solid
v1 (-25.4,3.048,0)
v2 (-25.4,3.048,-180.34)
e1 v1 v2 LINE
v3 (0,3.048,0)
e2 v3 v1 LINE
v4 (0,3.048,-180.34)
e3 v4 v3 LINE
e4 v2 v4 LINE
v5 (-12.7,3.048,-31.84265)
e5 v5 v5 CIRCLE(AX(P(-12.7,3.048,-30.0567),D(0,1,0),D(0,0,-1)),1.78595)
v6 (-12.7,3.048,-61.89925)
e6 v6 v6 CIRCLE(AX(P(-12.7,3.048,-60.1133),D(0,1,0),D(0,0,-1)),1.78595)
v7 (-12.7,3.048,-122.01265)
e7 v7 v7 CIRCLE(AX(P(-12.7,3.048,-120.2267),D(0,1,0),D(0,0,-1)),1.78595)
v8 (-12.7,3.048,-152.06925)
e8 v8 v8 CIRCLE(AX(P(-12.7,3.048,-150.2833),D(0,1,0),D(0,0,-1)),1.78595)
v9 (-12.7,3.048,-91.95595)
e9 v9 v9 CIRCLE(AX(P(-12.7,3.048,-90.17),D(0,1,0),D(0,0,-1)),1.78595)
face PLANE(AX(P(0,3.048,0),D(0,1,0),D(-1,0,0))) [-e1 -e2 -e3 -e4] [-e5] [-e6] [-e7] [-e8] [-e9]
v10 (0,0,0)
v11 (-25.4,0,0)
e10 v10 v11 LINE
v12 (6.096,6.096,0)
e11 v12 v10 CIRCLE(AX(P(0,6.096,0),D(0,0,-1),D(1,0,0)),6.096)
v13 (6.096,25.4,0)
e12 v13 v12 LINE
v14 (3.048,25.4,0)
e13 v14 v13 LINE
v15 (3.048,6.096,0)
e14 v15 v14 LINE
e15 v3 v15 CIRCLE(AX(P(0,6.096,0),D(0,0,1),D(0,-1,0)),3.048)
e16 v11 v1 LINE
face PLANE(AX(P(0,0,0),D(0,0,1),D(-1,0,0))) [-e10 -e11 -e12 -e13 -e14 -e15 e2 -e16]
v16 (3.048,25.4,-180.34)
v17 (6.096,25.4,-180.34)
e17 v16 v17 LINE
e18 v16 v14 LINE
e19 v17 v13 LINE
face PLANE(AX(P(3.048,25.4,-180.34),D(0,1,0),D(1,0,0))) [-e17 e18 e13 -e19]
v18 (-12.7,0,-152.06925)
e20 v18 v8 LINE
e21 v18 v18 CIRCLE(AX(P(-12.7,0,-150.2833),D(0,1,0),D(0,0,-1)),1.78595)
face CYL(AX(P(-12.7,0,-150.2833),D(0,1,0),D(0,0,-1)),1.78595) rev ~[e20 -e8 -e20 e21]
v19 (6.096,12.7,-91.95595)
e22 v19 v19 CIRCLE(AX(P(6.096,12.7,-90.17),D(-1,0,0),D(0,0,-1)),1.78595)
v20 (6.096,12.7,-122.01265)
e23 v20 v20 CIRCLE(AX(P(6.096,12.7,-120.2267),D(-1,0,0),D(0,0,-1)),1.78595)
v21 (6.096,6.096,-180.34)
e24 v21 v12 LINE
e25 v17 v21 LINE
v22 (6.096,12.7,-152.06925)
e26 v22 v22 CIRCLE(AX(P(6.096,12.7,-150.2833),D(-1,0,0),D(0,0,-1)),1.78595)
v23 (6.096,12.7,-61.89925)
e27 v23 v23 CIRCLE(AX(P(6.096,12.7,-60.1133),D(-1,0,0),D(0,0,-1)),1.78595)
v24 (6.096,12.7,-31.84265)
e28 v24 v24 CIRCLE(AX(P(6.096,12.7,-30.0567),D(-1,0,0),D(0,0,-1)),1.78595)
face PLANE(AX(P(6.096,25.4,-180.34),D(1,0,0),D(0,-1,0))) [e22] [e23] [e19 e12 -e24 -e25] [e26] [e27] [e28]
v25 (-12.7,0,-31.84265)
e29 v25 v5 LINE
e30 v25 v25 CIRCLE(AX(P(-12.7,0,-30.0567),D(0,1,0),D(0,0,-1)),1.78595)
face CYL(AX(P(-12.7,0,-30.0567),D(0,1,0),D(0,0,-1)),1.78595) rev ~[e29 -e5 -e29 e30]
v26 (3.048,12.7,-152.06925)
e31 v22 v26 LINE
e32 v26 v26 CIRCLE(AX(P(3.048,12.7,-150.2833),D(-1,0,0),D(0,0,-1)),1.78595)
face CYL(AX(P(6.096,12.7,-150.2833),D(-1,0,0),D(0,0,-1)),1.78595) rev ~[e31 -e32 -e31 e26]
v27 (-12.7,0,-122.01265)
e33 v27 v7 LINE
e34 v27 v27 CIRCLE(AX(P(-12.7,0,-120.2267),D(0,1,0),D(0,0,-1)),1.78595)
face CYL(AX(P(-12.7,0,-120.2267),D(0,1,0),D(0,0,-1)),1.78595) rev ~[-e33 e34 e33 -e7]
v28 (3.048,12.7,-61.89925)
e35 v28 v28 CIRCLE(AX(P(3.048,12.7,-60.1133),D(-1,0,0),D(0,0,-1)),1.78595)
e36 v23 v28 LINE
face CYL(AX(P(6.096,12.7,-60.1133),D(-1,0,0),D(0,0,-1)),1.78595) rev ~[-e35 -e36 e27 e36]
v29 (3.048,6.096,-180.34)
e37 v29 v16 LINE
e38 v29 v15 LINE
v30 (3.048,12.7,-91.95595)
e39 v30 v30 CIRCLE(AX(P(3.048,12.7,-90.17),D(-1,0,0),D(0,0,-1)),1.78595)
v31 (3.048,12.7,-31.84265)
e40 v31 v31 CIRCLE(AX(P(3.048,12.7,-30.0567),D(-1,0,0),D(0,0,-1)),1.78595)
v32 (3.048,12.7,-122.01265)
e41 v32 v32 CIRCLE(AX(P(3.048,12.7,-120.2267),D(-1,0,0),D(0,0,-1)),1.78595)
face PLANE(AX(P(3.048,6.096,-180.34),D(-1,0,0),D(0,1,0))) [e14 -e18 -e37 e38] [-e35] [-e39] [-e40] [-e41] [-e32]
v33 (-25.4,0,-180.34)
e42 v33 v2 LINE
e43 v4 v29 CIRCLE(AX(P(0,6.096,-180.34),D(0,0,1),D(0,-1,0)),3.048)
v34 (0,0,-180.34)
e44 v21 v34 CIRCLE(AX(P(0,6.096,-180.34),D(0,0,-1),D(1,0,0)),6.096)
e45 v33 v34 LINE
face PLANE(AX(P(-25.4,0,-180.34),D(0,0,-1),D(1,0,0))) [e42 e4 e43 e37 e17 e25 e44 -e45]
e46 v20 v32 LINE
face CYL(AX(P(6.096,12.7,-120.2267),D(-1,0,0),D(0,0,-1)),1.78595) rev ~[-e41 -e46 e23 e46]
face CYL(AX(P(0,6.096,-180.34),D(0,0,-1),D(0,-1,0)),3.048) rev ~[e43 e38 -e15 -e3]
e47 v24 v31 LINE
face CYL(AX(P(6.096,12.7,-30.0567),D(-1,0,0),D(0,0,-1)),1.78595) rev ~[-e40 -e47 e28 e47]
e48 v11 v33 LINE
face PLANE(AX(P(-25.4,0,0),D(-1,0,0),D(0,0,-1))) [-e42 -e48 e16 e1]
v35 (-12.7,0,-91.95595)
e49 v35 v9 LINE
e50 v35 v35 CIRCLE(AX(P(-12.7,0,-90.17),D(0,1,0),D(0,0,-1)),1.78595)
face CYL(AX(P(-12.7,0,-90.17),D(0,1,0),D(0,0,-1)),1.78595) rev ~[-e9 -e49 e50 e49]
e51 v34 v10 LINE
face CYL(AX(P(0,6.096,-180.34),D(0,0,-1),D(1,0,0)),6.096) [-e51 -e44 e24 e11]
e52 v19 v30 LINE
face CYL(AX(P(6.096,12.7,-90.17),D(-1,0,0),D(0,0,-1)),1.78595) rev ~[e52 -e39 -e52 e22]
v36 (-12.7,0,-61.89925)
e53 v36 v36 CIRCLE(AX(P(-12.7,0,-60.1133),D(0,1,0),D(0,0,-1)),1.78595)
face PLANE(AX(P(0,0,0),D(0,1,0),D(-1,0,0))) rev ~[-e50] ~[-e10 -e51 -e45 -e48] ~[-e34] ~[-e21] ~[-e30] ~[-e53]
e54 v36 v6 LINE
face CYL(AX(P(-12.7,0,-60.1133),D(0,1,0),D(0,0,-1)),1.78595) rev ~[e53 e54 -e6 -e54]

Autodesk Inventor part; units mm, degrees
ref_plane "YZ Plane" through (0, 0, 0) normal (1, 0, 0) x (0, 1, 0)
ref_plane "XZ Plane" through (0, 0, 0) normal (0, 1, 0) x (-1, 0, 0)
ref_plane "XY Plane" through (0, 0, 0) normal (0, 0, 1) x (1, 0, 0)
sketch "Sketch1" plane through (0, 0, 0) normal (0, 1, 0) x (-1, 0, 0)
  line L0 (0, 0) -> (25.4, 0)
  line L1 (25.4, 0) -> (25.4, -180.34)
  line L2 (25.4, -180.34) -> (0, -180.34)
  line L3 (0, -180.34) -> (0, 0)
  dimension "d0" = 25.4
  dimension "d1" = 180.34
extrude "Plate1" add sketch "Sketch1" along normal blind 3.048
sketch "Sketch2" plane through (3.048, 6.096, -180.34) normal (1, 0, 0) x (0, 1, 0)
  line L0 (0, 180.34) -> (0, 0)
  line L1 (0, 0) -> (19.304, 0)
  line L2 (19.304, 0) -> (19.304, 180.34)
  line L3 (19.304, 180.34) -> (0, 180.34)
edge flange "Flange1" height 25.4 angle 90 thickness 3.048 bend radius 3.048 thickness toward (1, 0, 0) relief tear relief width 3.048 relief depth 1.524 edges at (0, 3.048, -90.17) wall of the first edge with corners at (3.048, 6.096, 0) (3.048, 6.096, -180.34) (3.048, 25.4, -180.34) (3.048, 25.4, 0)
bend "Bend1"
corner "Corner1"
sketch "Sketch3" plane through (0, 0, 0) normal (0, -1, 0) x (1, 0, 0)
  line L0 (-25.4, 0) -> (-25.4, -180.34) projected
  line L1 (-25.4, -180.34) -> (0, -180.34) construction
  line L2 (-12.7, -180.34) -> (-12.7, -150.2833) construction
  line L3 (-12.7, -150.2833) -> (-12.7, -120.2267) construction
  line L4 (-12.7, -120.2267) -> (-12.7, -90.17) construction
  line L5 (-12.7, -90.17) -> (-12.7, -60.1133) construction
  line L6 (-12.7, -60.1133) -> (-12.7, -30.0567) construction
  line L7 (-12.7, -30.0567) -> (-12.7, 0) construction
  line L8 (0, 0) -> (-25.4, 0) construction
  dimension "d13" = 12.7
hole "Hole1" at (-12.7, 0, -120.2267) at (-12.7, 0, -150.2833) at (-12.7, 0, -90.17) at (-12.7, 0, -60.1133) at (-12.7, 0, -30.0567) direction (0, 1, 0) diameter 3.5719 depth 3.048 tip angle 118
sketch "Sketch4" plane through (6.096, 25.4, 0) normal (1, 0, 0) x (0, 0, -1)
  line L0 (0, -12.7) -> (30.0567, -12.7) construction
  line L1 (30.0567, -12.7) -> (60.1133, -12.7) construction
  line L2 (60.1133, -12.7) -> (90.17, -12.7) construction
  line L3 (90.17, -12.7) -> (120.2267, -12.7) construction
  line L4 (120.2267, -12.7) -> (150.2833, -12.7) construction
  line L5 (150.2833, -12.7) -> (180.34, -12.7) construction
  line L6 (180.34, -25.4) -> (0, -25.4) projected
  line L7 (180.34, 0) -> (180.34, -19.304) projected
  line L8 (0, -19.304) -> (0, 0) projected
  dimension "d21" = 12.7
hole "Hole2" at (6.096, 12.7, -30.0567) at (6.096, 12.7, -60.1133) at (6.096, 12.7, -90.17) at (6.096, 12.7, -120.2267) at (6.096, 12.7, -150.2833) direction (-1, 0, 0) diameter 3.5719 depth 3.048 tip angle 118
equation "\"d0\" = cb_outer_diameter"
equation "\"d1\" = bh_length"
equation "\"d13\" = 0.5 * cb_outer_diameter"
equation "\"d14\" = rv_hole_diameter"
equation "\"d19\" = Thickness"
equation "\"d21\" = 0.5 * cb_outer_diameter"
equation "\"d22\" = rv_hole_diameter"
equation "\"d27\" = Thickness"
equation "\"d3\" = BendReliefWidth"
equation "\"d4\" = BendReliefDepth"
equation "\"d5\" = MinimumRemnant"
equation "\"d6\" = BendRadius"
equation "\"d9\" = BendRadius"
equation "\"d10\" = CornerReliefSize"
equation "\"d11\" = GapSize"
equation "\"d12\" = JacobiRadiusSize"
equation "\"BendRadius\" = Thickness"
equation "\"BendReliefWidth\" = Thickness"
equation "\"BendReliefDepth\" = 0.5 * Thickness"
equation "\"CornerReliefSize\" = 4 * Thickness"
equation "\"MinimumRemnant\" = 2 * Thickness"
equation "\"TransitionRadius\" = BendRadius"
equation "\"JacobiRadiusSize\" = BendRadius"
equation "\"GapSize\" = Thickness"
equation "\"bh_width\" = 87.63"
equation "\"bh_length\" = 180.34"
equation "\"bh_height\" = 25.4"
equation "\"bh_metal_width\" = 3.048"
equation "\"cpn_diameter\" = 69.85"
equation "\"cpn_length\" = 311.15"
equation "\"cmp_foot_seperation_long\" = 139.954"
equation "\"cmp_foot_seperation_short\" = 36.068"
equation "\"cmp_mounting_margins\" = 6.35"
equation "\"cmp_foot_bolt_diameter\" = 6.35"
equation "\"spd_fillet_size\" = 3.175"
equation "\"cb_outer_diameter\" = 25.4"
equation "\"cb_wall_thickness\" = 1.5875"
equation "\"cb_length\" = 508"
equation "\"pdb_mounting_holes_short\" = 104.394"
equation "\"cb_pdb_low_mount_offset\" = 25.4"
equation "\"pdb_mounting_holes_long\" = 182.2704"
equation "\"pdb_ziptie_hole_diameter\" = 5.334"
equation "\"d2\" = BendRadius"
equation "\"rv_hole_diameter\" = 3.57187"
equation "\"Thickness\" = 3.048"
properties part number "long_angle_bracket"
